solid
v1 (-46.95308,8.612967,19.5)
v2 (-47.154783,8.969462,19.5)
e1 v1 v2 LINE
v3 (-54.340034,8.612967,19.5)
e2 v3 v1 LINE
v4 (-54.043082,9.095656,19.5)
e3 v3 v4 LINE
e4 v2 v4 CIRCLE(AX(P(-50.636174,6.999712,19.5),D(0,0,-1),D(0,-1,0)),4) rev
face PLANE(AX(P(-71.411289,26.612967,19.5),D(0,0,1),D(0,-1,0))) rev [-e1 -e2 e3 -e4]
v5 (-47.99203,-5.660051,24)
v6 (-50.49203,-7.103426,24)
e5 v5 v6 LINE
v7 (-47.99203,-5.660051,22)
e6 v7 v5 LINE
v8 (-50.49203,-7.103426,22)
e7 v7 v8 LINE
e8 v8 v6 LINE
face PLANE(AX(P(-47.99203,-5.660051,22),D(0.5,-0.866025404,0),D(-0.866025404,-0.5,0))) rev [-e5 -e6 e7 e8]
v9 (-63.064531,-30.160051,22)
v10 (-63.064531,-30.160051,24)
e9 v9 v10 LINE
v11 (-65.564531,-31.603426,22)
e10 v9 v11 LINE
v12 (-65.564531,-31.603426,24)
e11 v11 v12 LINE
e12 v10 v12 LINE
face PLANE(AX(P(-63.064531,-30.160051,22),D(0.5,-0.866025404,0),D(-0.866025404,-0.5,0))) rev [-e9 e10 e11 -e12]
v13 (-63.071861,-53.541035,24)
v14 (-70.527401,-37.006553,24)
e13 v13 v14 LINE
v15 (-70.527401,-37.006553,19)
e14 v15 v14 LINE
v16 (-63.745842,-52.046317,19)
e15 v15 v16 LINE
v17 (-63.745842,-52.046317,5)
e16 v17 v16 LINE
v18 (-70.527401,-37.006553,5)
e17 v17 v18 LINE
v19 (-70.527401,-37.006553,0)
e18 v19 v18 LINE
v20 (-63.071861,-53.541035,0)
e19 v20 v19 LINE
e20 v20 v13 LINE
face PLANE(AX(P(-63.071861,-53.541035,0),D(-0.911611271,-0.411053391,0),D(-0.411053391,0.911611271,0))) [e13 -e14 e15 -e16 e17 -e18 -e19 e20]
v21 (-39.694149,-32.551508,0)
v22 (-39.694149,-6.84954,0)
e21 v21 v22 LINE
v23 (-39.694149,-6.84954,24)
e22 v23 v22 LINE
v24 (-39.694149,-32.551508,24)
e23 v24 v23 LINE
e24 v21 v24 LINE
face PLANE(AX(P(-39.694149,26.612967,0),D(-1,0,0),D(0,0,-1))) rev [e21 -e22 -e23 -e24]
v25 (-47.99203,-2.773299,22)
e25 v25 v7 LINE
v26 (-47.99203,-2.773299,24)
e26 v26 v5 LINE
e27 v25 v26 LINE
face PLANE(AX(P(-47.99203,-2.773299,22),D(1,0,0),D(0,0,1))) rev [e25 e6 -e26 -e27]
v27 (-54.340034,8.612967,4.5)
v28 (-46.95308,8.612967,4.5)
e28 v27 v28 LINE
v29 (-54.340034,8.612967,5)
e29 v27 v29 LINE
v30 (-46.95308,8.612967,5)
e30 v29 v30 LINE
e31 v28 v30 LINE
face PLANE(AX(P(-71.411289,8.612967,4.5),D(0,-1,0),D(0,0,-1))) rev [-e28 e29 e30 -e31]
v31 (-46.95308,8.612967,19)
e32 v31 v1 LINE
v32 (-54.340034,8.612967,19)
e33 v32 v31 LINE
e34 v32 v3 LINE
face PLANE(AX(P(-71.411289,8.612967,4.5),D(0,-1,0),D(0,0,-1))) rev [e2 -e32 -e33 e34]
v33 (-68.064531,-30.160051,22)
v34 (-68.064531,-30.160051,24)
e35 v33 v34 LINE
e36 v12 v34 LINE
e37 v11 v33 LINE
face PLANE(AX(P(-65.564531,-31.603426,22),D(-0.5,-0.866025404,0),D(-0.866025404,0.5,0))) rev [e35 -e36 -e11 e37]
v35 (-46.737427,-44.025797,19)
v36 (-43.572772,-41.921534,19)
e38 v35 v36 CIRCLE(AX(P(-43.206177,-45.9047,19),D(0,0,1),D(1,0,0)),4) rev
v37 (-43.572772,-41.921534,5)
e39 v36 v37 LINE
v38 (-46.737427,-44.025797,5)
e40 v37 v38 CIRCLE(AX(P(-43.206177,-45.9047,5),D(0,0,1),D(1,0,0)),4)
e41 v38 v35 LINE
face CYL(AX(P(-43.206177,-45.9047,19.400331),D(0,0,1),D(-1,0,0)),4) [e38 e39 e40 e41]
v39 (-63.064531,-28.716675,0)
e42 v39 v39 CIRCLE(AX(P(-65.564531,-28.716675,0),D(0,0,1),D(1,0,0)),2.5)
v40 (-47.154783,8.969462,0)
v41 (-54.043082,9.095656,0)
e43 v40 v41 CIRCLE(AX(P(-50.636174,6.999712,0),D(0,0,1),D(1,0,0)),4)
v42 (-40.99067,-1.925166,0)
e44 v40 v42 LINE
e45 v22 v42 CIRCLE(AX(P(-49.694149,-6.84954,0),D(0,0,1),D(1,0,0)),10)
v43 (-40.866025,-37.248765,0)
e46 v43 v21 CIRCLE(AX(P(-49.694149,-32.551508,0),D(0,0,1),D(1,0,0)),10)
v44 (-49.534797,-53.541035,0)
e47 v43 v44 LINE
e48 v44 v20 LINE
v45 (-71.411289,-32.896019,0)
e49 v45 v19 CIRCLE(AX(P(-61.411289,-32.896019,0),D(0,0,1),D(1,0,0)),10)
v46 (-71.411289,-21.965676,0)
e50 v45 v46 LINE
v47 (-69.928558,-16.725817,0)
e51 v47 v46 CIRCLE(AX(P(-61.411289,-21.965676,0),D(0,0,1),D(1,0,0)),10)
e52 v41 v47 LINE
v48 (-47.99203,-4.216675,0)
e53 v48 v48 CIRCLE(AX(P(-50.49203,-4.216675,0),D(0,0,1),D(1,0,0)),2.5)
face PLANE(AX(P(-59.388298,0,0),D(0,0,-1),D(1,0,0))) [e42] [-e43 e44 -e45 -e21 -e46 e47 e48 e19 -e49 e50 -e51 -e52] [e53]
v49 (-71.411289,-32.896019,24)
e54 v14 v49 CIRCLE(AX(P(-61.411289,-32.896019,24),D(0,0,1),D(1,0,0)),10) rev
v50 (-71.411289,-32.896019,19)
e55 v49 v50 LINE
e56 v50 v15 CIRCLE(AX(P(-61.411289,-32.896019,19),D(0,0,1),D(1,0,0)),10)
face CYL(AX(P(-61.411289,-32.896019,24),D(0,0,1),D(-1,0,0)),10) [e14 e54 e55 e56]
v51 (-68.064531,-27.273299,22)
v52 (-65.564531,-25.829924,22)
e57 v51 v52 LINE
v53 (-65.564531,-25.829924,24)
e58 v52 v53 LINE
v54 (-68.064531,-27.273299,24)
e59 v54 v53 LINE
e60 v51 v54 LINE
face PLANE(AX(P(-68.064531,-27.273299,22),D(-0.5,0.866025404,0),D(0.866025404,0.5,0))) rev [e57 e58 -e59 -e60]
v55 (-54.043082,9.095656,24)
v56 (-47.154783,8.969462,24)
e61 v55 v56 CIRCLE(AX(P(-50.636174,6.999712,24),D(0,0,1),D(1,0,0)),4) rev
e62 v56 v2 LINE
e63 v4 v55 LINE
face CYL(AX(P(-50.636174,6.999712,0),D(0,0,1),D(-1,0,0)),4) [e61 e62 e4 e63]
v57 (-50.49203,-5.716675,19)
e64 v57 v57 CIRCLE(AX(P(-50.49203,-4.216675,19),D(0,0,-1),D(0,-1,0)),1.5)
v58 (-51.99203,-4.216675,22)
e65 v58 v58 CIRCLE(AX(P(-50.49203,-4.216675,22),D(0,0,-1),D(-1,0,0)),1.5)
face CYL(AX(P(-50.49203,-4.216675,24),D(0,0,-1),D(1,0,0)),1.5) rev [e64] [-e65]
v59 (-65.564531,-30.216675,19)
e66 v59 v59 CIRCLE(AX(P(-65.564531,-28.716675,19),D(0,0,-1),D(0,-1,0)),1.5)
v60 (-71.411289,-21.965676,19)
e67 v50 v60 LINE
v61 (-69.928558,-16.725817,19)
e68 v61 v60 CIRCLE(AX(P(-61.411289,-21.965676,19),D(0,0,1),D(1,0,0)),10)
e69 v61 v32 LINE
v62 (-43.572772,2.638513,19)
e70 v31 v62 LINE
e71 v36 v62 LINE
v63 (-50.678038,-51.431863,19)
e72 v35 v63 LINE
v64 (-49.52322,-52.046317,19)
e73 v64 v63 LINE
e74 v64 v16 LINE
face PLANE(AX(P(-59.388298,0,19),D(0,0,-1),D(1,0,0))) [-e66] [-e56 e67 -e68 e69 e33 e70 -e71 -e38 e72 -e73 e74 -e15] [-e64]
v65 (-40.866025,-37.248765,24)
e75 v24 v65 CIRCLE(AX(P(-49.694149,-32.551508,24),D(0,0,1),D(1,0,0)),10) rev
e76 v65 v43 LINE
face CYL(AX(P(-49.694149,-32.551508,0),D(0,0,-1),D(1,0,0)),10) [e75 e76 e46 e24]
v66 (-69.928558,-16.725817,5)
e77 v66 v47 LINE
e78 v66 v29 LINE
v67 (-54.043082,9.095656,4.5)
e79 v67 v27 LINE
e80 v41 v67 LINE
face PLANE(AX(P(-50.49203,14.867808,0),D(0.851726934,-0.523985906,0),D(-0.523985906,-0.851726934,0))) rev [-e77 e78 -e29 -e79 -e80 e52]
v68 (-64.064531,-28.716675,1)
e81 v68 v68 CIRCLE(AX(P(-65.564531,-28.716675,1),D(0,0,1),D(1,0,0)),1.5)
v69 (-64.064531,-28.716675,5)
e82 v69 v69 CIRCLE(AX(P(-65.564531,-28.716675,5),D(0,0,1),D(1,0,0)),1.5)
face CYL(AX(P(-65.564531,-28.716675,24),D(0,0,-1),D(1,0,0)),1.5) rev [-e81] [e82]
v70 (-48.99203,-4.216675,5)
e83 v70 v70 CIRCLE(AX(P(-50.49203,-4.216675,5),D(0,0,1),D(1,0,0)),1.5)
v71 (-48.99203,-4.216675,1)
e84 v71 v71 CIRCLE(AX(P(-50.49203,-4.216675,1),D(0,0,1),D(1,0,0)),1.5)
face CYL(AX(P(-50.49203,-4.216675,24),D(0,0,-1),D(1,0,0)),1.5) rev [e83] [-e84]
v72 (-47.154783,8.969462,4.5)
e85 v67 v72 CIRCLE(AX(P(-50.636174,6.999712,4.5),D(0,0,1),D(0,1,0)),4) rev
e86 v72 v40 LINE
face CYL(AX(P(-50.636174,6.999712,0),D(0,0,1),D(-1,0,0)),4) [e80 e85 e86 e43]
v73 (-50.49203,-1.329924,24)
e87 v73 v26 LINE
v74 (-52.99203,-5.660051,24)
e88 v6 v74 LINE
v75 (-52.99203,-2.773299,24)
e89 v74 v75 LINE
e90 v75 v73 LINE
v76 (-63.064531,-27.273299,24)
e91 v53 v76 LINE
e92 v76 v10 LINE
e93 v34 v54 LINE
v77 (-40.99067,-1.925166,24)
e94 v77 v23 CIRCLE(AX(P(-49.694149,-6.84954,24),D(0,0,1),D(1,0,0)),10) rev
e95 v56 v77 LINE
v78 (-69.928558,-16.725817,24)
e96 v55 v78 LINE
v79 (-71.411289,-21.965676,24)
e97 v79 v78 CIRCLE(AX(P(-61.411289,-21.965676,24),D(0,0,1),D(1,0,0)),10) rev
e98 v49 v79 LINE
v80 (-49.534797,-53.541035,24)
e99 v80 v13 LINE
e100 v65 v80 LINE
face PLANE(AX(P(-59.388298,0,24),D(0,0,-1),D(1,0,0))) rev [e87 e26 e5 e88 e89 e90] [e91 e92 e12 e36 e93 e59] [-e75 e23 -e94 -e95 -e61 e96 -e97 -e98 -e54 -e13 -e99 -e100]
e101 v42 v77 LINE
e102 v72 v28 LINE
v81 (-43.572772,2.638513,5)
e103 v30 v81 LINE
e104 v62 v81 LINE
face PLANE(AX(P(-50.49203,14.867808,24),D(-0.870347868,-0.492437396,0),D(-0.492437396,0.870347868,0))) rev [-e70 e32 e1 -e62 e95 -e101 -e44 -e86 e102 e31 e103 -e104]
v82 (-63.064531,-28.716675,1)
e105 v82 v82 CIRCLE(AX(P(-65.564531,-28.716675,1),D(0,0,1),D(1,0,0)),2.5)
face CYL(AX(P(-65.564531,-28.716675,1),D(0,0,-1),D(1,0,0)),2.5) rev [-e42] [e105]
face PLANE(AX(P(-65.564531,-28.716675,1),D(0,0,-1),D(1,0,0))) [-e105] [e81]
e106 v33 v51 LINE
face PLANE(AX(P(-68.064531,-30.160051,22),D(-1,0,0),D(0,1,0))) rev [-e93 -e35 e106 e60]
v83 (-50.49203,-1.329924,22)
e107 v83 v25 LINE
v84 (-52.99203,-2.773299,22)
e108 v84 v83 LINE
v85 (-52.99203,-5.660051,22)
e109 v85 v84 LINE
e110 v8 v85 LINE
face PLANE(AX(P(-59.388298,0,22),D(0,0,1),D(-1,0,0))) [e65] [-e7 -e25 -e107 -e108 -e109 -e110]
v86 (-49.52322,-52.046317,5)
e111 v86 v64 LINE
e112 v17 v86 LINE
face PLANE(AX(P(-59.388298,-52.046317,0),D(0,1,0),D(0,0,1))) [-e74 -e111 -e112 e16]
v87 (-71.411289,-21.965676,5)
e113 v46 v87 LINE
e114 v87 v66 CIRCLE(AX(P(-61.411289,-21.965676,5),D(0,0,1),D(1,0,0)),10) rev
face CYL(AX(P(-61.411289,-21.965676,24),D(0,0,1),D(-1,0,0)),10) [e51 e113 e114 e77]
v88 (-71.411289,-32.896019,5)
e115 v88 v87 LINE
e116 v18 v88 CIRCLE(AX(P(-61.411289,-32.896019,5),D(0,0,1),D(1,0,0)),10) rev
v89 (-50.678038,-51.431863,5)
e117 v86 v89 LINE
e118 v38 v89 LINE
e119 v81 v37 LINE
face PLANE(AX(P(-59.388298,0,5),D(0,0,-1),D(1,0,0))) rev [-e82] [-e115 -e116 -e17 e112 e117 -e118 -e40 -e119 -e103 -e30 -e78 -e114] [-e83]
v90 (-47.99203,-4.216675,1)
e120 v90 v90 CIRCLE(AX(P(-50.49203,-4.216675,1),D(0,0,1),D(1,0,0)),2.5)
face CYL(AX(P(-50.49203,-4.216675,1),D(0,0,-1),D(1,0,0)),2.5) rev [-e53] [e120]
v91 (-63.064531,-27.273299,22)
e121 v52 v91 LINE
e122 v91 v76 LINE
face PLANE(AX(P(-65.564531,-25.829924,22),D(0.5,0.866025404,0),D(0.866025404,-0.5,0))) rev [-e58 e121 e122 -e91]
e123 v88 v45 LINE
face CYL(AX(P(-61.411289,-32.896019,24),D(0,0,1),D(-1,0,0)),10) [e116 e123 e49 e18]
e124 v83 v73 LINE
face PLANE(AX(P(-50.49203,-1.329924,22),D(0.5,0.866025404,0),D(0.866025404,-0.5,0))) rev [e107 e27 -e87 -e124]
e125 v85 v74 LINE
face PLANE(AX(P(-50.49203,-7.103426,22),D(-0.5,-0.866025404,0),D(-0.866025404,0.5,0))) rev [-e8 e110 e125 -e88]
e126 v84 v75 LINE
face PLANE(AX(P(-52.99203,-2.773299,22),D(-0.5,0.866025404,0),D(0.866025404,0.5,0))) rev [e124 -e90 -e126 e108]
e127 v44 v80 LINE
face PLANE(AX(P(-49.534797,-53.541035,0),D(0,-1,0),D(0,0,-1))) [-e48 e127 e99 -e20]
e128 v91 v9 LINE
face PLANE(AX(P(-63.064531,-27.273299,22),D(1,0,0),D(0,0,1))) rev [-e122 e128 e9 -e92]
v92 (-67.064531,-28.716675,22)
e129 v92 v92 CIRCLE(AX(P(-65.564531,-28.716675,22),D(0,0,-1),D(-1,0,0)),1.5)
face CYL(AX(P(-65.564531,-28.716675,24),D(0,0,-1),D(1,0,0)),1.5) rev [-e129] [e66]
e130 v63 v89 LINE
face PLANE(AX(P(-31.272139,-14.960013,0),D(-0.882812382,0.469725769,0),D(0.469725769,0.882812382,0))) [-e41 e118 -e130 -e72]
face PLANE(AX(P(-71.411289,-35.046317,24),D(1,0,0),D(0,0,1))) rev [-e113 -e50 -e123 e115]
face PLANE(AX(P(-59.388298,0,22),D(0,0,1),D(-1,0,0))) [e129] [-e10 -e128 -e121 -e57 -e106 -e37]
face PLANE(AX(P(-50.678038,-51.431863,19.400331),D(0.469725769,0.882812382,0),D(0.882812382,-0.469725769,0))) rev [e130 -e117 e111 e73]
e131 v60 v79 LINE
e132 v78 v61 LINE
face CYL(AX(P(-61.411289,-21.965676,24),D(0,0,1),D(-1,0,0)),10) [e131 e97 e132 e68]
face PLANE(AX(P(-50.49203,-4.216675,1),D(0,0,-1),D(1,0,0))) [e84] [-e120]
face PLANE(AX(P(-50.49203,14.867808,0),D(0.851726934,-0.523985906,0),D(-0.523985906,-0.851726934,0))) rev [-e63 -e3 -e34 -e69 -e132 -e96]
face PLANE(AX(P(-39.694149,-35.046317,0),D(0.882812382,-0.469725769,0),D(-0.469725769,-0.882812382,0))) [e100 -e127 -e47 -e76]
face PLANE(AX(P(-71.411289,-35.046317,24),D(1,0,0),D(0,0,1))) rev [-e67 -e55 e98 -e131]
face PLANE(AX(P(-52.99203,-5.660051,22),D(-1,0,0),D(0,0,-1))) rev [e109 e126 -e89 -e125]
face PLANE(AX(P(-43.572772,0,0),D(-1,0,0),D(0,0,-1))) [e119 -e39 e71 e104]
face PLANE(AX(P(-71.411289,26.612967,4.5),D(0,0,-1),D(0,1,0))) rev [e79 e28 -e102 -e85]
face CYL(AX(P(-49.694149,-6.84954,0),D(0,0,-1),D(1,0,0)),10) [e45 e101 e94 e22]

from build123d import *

# Parameters (mm, degrees)
SKETCH_1_W           = 41.838517058
SKETCH_1_H           = 61.659283987
SKETCH_1_R           = 1.5
EXTRUDE_1_DEPTH      = 24
SHELL_START          = 5
SHELL_2_OUTLINE_R    = 6.5
SHELL_2_DEPTH        = 14
SKETCH_7_W           = 14
SKETCH_7_H           = 61.659283987
CUT_EXTRUDE_2_DEPTH  = 38
SKETCH_11_W          = 14
SKETCH_11_H          = 61.659283987
EXTRUDE_2_DEPTH      = 14
SKETCH_12_W          = 10.1213772
SKETCH_12_H          = 61.659283987
CUT_EXTRUDE_3_DEPTH  = 52.896145639
CUT_EXTRUDE_5_DEPTH  = 47.819908548
SKETCH_18_W          = 15
SKETCH_18_H          = 18
CUT_EXTRUDE_6_DEPTH  = 54.011520411
EXTRUDE_5_DEPTH      = 24
SKETCH_22_W          = 27.838517058
SKETCH_22_H          = 14
CUT_EXTRUDE_8_DEPTH  = 17
SKETCH_23_W          = 14.991158549
SKETCH_23_H          = 11.73336261
EXTRUDE_8_DEPTH      = 2
FILLET_3_R           = 4
CUT_EXTRUDE_9_DEPTH  = 62.891048756
FILLET_4_R           = 4
FILLET_5_R           = 10
CUT_EXTRUDE_10_DEPTH = 2
SKETCH_26_R          = 2.5
CUT_EXTRUDE_11_DEPTH = 1


# Read off the part's stored shape, not the designer's step: 抽壳2
with BuildPart() as part:
    # 草图1 → 凸台-拉伸1 (new body)
    with BuildSketch(Plane.XY):
        with Locations((-8.896267572, -4.216675009)):
            Rectangle(SKETCH_1_W, SKETCH_1_H)
        with Locations((-8.896267572, -4.21667501)):
            Circle(SKETCH_1_R, mode=Mode.SUBTRACT)
        with Locations((6.176232993, -28.71667501)):
            Circle(SKETCH_1_R, mode=Mode.SUBTRACT)
    extrude(amount=EXTRUDE_1_DEPTH)

    # 抽壳2 outline → 抽壳2 (cut)
    # profile 1 of 2: a face of its own
    with BuildSketch(Plane.XY.offset(SHELL_START)):
        with BuildLine():
            Line((-24.815526101, 26.612966984), (-24.815526101, -35.046317003))
            Line((-24.815526101, -35.046317003), (4.697844602, -35.046317003))
            ThreePointArc((4.697844602, -35.046317003), (1.097738874, -24.659718332), (12.022990957, -25.876706469))
            Line((12.022990957, -25.876706469), (12.022990957, 26.612966984))
            Line((12.022990957, 26.612966984), (-24.815526101, 26.612966984))
        make_face()
        with Locations((-8.896267572, -4.21667501)):
            Circle(SHELL_2_OUTLINE_R, mode=Mode.SUBTRACT)
    # profile 2 of 2: a face of its own
    with BuildSketch(Plane.XY.offset(SHELL_START)):
        with BuildLine():
            ThreePointArc((12.022990957, -31.556643551), (10.23318967, -33.795169129), (7.654621384, -35.046317003))
            Line((7.654621384, -35.046317003), (12.022990957, -35.046317003))
            Line((12.022990957, -35.046317003), (12.022990957, -31.556643551))
        make_face()
    extrude(amount=SHELL_2_DEPTH, mode=Mode.SUBTRACT)

    # 草图7 → 切除-拉伸2 (cut)
    with BuildSketch(Plane(origin=(12.022990957, 0, 0), x_dir=(0, 0, -1), z_dir=(1, 0, 0))):
        with Locations((-12, -4.216675009)):
            Rectangle(SKETCH_7_W, SKETCH_7_H)
    extrude(amount=-CUT_EXTRUDE_2_DEPTH, mode=Mode.SUBTRACT)

    # 草图11 → 凸台-拉伸2 (add)
    with BuildSketch(Plane.ZY.offset(29.815526101)):
        with Locations((12, -4.216675009)):
            Rectangle(SKETCH_11_W, SKETCH_11_H)
    extrude(amount=-EXTRUDE_2_DEPTH)

    # 草图12 → 切除-拉伸3 (cut, through all)
    with BuildSketch(Plane.XY.offset(24)):
        with Locations((-24.754837501, -4.216675009)):
            Rectangle(SKETCH_12_W, SKETCH_12_H)
    extrude(amount=-CUT_EXTRUDE_3_DEPTH, mode=Mode.SUBTRACT)

    # 草图17 → 切除-拉伸5 (cut, through all)
    with BuildSketch(Plane.XY.offset(24)):
        Polygon((-8.896267572, 26.612966984), (-8.896267572, 14.867807771), (12.022990957, -19.135961659), (12.022990957, 26.612966984), align=None)
    extrude(amount=-CUT_EXTRUDE_5_DEPTH, mode=Mode.SUBTRACT)

    # 草图18 → 切除-拉伸6 (cut, through all)
    with BuildSketch(Plane.ZY.offset(19.694148901)):
        with Locations((12, 17.612966984)):
            Rectangle(SKETCH_18_W, SKETCH_18_H)
    extrude(amount=-CUT_EXTRUDE_6_DEPTH, mode=Mode.SUBTRACT)

    # 草图20 → 凸台-拉伸5 (add)
    with BuildSketch(Plane.XY.offset(24)):
        Polygon((-19.694148901, -35.046317003), (-9.853501275, -53.541034872), (3.683563025, -53.541034872), (12.022990957, -35.046317003), align=None)
    extrude(amount=-EXTRUDE_5_DEPTH)

    # 草图22 → 切除-拉伸8 (cut)
    with BuildSketch(Plane(origin=(0, -35.046317003, 0), x_dir=(1, 0, 0), z_dir=(0, 1, 0))):
        with Locations((-1.896267572, -12)):
            Rectangle(SKETCH_22_W, SKETCH_22_H)
    extrude(amount=-CUT_EXTRUDE_8_DEPTH, mode=Mode.SUBTRACT)

    # 草图23 → 凸台-拉伸8 (add)
    with BuildSketch(Plane(origin=(-29.881783728, -15.899464172, 0), x_dir=(0, 0, -1), z_dir=(0.8828123820911005, 0.469725768961675, 0))):
        with Locations((-11.904751729, -35.446570554)):
            Rectangle(SKETCH_23_W, SKETCH_23_H)
    extrude(amount=EXTRUDE_8_DEPTH)

    # 圆角3
    # the kernel refuses this fillet: 4 mm, written as the material it takes off along each edge
    with BuildSketch(Plane(origin=(-14.221722741, -41.073505124, 19), x_dir=(-0.8828123820904301, -0.4697257689629349, 0), z_dir=(0, 0, -1))) as fillet_3_piece_1:
        with BuildLine():
            CenterArc((4, -3.344189139), FILLET_3_R, 123.274953356, 56.725046644)
            Line((0, -3.344189139), (-0.08, -3.344189139))
            Line((-0.08, -3.344189139), (-0.08, 0))
            Line((-0.08, 0), (0, 0.08))
            ThreePointArc((0, 0.08), (0.902685209, 0.08), (1.761477827, 0.066883783))
            Line((1.761477827, 0.066883783), (1.805370419, 0))
        make_face()
    extrude(amount=14, mode=Mode.SUBTRACT)

    # 草图24 → 切除-拉伸9 (cut, through all)
    with BuildSketch(Plane(origin=(0, 0, 0), x_dir=(-1, 0, 0), z_dir=(0, 0, -1))):
        Polygon((8.896267572, 14.867807771), (19.694148901, -4.21667501), (19.694148901, 26.612966984), (8.896267572, 26.612966984), align=None)
    extrude(amount=-CUT_EXTRUDE_9_DEPTH, mode=Mode.SUBTRACT)

    # 圆角4
    fillet_4_edges = [part.edges().sort_by_distance(p)[0] for p in [
        (-8.896267572, 14.867807771, 2.25),
        (-8.896267572, 14.867807771, 21.75),
    ]]
    fillet(fillet_4_edges, radius=FILLET_4_R)

    # 圆角5
    fillet_5_edges = [part.edges().sort_by_distance(p)[0] for p in [
        (-19.694148901, -35.046317003, 12),
        (12.022990957, -19.135961659, 2.5),
        (12.022990957, -19.135961659, 21.5),
        (12.022990957, -35.046317003, 2.5),
        (-19.694148901, -4.21667501, 12),
        (12.022990957, -35.046317003, 21.5),
    ]]
    fillet(fillet_5_edges, radius=FILLET_5_R)

    # 草图25 → 切除-拉伸10 (cut)
    with BuildSketch(Plane.XY.offset(24)):
        Polygon((-8.896267572, -7.103426356), (-6.396267572, -5.660050683), (-6.396267572, -2.773299337), (-8.896267572, -1.329923664), (-11.396267572, -2.773299337), (-11.396267572, -5.660050683), align=None)
        Polygon((6.176232993, -25.829923664), (3.676232993, -27.273299337), (3.676232993, -30.160050683), (6.176232993, -31.603426356), (8.676232993, -30.160050683), (8.676232993, -27.273299337), align=None)
    extrude(amount=-CUT_EXTRUDE_10_DEPTH, mode=Mode.SUBTRACT)

    # 草图26 → 切除-拉伸11 (cut)
    with BuildSketch(Plane(origin=(0, 0, 0), x_dir=(-1, 0, 0), z_dir=(0, 0, -1))):
        with Locations((8.896267572, -4.21667501)):
            Circle(SKETCH_26_R)
        with Locations((-6.176232993, -28.71667501)):
            Circle(SKETCH_26_R)
    extrude(amount=-CUT_EXTRUDE_11_DEPTH, mode=Mode.SUBTRACT)


with BuildPart() as body_2:
    # 镜向1: mirrored copy
    add(part.part.mirror(Plane.ZY.offset(29.694148901)))


solid = body_2.part
